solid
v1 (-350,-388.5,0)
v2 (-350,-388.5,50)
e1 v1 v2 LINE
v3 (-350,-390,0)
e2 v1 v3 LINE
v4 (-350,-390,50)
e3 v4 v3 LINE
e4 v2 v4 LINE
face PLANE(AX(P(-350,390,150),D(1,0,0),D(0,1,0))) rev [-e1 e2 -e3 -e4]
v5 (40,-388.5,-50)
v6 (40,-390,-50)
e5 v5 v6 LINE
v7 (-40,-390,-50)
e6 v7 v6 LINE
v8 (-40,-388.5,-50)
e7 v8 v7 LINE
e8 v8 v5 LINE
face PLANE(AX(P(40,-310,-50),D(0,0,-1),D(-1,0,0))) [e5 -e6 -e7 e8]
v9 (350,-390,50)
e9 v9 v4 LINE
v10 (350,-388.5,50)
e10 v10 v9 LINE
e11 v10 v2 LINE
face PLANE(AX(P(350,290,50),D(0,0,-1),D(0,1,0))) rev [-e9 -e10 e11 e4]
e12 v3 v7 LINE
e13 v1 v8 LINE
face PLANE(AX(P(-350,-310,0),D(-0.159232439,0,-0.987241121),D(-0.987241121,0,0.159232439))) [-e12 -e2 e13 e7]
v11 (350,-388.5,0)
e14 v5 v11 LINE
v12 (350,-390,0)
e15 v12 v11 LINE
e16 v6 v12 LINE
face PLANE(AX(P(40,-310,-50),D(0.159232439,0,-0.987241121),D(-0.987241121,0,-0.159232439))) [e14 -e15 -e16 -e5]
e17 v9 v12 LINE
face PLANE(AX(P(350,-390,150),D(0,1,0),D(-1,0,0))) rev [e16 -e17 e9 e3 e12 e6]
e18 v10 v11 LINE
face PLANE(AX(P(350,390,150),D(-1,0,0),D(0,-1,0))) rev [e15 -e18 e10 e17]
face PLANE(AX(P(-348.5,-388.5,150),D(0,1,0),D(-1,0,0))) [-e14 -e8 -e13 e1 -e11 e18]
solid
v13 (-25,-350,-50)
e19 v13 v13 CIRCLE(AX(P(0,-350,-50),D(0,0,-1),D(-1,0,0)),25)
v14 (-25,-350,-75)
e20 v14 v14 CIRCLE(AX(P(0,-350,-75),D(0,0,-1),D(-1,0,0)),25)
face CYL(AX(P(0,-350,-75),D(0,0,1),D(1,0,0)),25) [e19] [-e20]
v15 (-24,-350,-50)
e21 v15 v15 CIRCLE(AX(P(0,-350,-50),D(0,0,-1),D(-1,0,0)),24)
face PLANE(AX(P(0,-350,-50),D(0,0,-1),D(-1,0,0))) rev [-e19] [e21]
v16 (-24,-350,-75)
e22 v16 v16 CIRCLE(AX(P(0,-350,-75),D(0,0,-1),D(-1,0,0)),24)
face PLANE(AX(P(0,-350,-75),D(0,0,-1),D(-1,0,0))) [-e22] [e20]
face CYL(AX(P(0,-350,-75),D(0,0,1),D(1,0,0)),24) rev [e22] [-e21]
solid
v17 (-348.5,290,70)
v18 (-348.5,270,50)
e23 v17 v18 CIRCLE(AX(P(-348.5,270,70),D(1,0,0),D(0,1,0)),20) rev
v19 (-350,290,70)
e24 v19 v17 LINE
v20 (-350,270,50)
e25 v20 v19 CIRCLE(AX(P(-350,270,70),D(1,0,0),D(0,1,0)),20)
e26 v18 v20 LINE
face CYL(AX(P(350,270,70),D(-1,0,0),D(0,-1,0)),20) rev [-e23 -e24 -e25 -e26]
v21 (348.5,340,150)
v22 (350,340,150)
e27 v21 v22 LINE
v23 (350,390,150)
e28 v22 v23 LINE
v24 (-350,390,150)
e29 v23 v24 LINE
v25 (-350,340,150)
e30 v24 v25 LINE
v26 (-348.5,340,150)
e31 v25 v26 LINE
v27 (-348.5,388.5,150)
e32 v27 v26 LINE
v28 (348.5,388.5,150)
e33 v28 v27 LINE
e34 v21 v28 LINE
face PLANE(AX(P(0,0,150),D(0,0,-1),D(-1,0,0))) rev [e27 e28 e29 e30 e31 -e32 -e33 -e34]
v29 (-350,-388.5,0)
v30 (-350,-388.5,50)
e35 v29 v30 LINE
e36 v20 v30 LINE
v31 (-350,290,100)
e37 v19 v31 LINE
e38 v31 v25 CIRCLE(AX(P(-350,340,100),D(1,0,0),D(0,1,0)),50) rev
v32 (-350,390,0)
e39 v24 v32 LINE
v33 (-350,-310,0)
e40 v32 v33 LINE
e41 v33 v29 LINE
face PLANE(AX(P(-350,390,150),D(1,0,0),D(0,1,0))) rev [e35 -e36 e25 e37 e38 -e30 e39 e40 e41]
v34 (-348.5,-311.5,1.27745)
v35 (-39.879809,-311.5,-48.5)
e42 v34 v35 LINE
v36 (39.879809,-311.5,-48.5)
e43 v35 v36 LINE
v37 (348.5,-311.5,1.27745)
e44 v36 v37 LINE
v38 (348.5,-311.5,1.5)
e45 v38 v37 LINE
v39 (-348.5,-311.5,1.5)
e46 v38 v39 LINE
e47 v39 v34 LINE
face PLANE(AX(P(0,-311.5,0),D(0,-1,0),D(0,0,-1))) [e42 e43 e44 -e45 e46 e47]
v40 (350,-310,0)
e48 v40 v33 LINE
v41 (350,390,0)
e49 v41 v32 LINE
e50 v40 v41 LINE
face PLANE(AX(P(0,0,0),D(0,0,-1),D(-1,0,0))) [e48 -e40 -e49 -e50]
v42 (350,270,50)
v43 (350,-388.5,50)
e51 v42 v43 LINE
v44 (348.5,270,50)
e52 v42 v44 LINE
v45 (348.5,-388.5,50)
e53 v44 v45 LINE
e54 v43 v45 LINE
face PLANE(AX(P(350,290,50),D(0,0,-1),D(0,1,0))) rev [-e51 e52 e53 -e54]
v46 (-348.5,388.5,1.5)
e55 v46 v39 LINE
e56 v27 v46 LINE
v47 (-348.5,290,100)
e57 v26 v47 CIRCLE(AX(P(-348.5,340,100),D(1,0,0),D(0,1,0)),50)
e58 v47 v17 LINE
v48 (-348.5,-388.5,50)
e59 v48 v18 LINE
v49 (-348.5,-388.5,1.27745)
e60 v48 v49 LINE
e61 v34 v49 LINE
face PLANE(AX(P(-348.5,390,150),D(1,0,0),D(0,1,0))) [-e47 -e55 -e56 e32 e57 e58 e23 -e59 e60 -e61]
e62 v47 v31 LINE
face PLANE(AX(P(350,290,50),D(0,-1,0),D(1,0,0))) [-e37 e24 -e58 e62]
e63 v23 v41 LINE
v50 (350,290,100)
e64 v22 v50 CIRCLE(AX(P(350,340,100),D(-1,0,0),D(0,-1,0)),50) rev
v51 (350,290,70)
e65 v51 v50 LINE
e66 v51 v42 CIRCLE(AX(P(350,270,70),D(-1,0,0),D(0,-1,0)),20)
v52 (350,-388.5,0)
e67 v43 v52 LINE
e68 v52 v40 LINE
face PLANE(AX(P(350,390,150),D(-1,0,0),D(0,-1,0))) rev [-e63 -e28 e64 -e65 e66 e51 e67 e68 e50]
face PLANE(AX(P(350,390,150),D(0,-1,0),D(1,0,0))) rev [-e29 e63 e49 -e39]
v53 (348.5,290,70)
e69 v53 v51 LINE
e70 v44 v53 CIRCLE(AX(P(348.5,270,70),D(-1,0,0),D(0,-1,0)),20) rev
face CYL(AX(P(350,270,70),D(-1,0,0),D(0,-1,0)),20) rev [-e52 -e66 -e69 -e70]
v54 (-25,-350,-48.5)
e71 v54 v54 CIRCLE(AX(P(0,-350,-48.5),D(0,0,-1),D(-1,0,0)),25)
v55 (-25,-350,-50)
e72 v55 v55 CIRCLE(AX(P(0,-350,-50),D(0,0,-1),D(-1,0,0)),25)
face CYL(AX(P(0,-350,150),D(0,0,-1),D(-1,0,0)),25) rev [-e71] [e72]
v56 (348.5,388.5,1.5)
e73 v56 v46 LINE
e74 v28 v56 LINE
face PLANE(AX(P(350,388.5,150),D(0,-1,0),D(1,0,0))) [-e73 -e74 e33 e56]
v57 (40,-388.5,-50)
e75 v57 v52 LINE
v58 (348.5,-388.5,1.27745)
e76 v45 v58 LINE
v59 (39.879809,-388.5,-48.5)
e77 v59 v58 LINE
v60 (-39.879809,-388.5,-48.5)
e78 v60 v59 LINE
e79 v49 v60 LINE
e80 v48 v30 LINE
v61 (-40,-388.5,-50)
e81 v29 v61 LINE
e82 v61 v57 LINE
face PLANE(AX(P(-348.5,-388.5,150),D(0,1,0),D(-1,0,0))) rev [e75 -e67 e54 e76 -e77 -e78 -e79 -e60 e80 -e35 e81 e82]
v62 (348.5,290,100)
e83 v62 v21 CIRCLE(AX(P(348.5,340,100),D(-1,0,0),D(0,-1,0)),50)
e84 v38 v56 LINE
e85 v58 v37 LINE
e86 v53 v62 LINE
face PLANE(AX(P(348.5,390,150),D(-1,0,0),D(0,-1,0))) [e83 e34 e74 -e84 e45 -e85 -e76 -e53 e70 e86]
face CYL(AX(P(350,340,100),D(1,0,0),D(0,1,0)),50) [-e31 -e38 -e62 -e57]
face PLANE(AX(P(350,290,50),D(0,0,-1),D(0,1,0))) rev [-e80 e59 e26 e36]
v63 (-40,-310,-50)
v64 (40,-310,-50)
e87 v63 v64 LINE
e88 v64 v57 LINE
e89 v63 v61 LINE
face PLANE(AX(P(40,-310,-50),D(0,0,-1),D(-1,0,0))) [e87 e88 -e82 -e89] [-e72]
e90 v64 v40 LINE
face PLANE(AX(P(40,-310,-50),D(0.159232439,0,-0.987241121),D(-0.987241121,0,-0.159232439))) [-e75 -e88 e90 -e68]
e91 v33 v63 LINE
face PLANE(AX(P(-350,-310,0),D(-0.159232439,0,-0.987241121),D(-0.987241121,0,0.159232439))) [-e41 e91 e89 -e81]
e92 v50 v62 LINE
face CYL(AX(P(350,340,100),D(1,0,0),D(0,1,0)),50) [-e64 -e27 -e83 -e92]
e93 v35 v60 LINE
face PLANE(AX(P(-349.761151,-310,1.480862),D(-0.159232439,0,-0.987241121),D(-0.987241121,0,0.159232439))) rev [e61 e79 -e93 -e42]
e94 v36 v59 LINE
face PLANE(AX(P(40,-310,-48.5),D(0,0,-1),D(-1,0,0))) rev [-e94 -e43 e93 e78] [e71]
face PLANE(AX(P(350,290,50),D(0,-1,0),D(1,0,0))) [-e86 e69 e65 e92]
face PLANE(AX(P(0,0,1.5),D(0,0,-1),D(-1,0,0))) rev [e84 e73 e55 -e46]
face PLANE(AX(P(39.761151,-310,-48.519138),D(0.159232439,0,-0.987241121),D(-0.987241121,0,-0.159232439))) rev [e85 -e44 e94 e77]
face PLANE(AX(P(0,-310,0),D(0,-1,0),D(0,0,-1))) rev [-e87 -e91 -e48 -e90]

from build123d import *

# Parameters (mm, degrees)
SKETCH_6_W                 = 700
SKETCH_6_H                 = 780
EXTRUDE_2_DEPTH            = 150
EXTRUDE_4_DEPTH            = 80
SHELL_START                = -388.5
SHELL_2_OUTLINE_W          = 697
SHELL_2_OUTLINE_H          = 148.5
SHELL_2_DEPTH              = 777
SHELL_2_2_DEPTH            = 77
SKETCH_13_R                = 25
CUT_EXTRUDE_1_DEPTH        = 561.892146495
SPLIT_START                = -390
SPLIT_BODIES_5_DEPTH       = 1.5
SPLIT_BODIES_5_2_OUTLINE_W = 702
SPLIT_BODIES_5_2_OUTLINE_H = 203
SPLIT_BODIES_5_2_DEPTH     = 1.5
SKETCH_15_W                = 200.791070075
SKETCH_15_H                = 716.3886285
CUT_EXTRUDE_2_DEPTH        = 816.230028888
FILLET_1_R                 = 20
FILLET_2_R                 = 50
SKETCH_16_R                = 25
SKETCH_16_R_2              = 24
EXTRUDE_5_DEPTH            = 25


# Read off the part's stored shape, not the designer's step: 抽壳2, 分割5
with BuildPart() as part:
    # 草图6 → 凸台-拉伸2 (new body)
    with BuildSketch(Plane.XY):
        Rectangle(SKETCH_6_W, SKETCH_6_H)
    extrude(amount=EXTRUDE_2_DEPTH)

    # 草图8 → 凸台-拉伸4 (add)
    with BuildSketch(Plane.XZ.offset(390)):
        Polygon((-350, 0), (-40, -50), (40, -50), (350, 0), align=None)
    extrude(amount=-EXTRUDE_4_DEPTH)

    # 抽壳2 outline → 抽壳2 (cut)
    with BuildSketch(Plane(origin=(0, 0, 0), x_dir=(1, 0, 0), z_dir=(0, 1, 0)).offset(SHELL_START)):
        with Locations((0, -75.75)):
            Rectangle(SHELL_2_OUTLINE_W, SHELL_2_OUTLINE_H)
    extrude(amount=SHELL_2_DEPTH, mode=Mode.SUBTRACT)

    # Shell 2 2 outline → Shell 2 2 (cut)
    with BuildSketch(Plane(origin=(0, 0, 0), x_dir=(1, 0, 0), z_dir=(0, 1, 0)).offset(SHELL_START)):
        Polygon((-348.5, -1.5), (348.5, -1.5), (348.5, -1.277450174), (39.879808919, 48.5), (-39.879808919, 48.5), (-348.5, -1.277450174), align=None)
    extrude(amount=SHELL_2_2_DEPTH, mode=Mode.SUBTRACT)

    # 草图13 → 切除-拉伸1 (cut, through all)
    with BuildSketch(Plane(origin=(0, 0, -50), x_dir=(-1, 0, 0), z_dir=(0, 0, -1))):
        with Locations((0, -350)):
            Circle(SKETCH_13_R)
    extrude(amount=-CUT_EXTRUDE_1_DEPTH, mode=Mode.SUBTRACT)

    # Split Bodies 5 2 outline → Split Bodies 5 2 (cut)
    with BuildSketch(Plane(origin=(0, 0, 0), x_dir=(1, 0, 0), z_dir=(0, 1, 0)).offset(SPLIT_START)):
        with Locations((0, -49.5)):
            Rectangle(SPLIT_BODIES_5_2_OUTLINE_W, SPLIT_BODIES_5_2_OUTLINE_H)
    extrude(amount=SPLIT_BODIES_5_2_DEPTH, mode=Mode.SUBTRACT)


with BuildPart() as body_2:
    # Split Bodies 5 outline → Split Bodies 5 (new body)
    with BuildSketch(Plane(origin=(0, 0, 0), x_dir=(1, 0, 0), z_dir=(0, 1, 0)).offset(SPLIT_START)):
        Polygon((-350, -150), (350, -150), (350, 0), (40, 50), (-40, 50), (-350, 0), align=None)
    extrude(amount=SPLIT_BODIES_5_DEPTH)


with BuildPart() as cut_extrude_2_tool:
    # 草图15 → 切除-拉伸2 (new, through all)
    with BuildSketch(Plane.ZY.offset(350)):
        with Locations((150.395535037, -68.19431425)):
            Rectangle(SKETCH_15_W, SKETCH_15_H)
    extrude(amount=-CUT_EXTRUDE_2_DEPTH)


with BuildPart() as part_1:
    add(part.part)

    # 切除-拉伸2: cut by cut_extrude_2_tool
    add(cut_extrude_2_tool.part, mode=Mode.SUBTRACT)

    # 圆角1
    fillet_1_edges = [part_1.edges().sort_by_distance(p)[0] for p in [
        (-349.25, 290, 50),
        (349.25, 290, 50),
    ]]
    fillet(fillet_1_edges, radius=FILLET_1_R)

    # 圆角2
    fillet_2_edges = [part_1.edges().sort_by_distance(p)[0] for p in [
        (-349.25, 290, 150),
        (349.25, 290, 150),
    ]]
    fillet(fillet_2_edges, radius=FILLET_2_R)


with BuildPart() as body_2_1:
    add(body_2.part)

    # 切除-拉伸2: cut by cut_extrude_2_tool
    add(cut_extrude_2_tool.part, mode=Mode.SUBTRACT)


with BuildPart() as body_3:
    # 草图16 → 凸台-拉伸5 (new body)
    with BuildSketch(Plane(origin=(0, 0, -50), x_dir=(-1, 0, 0), z_dir=(0, 0, -1))):
        with Locations((0, -350)):
            Circle(SKETCH_16_R)
        with Locations((0, -350)):
            Circle(SKETCH_16_R_2, mode=Mode.SUBTRACT)
    extrude(amount=EXTRUDE_5_DEPTH)


solid = Compound([part_1.part, body_2_1.part, body_3.part])
